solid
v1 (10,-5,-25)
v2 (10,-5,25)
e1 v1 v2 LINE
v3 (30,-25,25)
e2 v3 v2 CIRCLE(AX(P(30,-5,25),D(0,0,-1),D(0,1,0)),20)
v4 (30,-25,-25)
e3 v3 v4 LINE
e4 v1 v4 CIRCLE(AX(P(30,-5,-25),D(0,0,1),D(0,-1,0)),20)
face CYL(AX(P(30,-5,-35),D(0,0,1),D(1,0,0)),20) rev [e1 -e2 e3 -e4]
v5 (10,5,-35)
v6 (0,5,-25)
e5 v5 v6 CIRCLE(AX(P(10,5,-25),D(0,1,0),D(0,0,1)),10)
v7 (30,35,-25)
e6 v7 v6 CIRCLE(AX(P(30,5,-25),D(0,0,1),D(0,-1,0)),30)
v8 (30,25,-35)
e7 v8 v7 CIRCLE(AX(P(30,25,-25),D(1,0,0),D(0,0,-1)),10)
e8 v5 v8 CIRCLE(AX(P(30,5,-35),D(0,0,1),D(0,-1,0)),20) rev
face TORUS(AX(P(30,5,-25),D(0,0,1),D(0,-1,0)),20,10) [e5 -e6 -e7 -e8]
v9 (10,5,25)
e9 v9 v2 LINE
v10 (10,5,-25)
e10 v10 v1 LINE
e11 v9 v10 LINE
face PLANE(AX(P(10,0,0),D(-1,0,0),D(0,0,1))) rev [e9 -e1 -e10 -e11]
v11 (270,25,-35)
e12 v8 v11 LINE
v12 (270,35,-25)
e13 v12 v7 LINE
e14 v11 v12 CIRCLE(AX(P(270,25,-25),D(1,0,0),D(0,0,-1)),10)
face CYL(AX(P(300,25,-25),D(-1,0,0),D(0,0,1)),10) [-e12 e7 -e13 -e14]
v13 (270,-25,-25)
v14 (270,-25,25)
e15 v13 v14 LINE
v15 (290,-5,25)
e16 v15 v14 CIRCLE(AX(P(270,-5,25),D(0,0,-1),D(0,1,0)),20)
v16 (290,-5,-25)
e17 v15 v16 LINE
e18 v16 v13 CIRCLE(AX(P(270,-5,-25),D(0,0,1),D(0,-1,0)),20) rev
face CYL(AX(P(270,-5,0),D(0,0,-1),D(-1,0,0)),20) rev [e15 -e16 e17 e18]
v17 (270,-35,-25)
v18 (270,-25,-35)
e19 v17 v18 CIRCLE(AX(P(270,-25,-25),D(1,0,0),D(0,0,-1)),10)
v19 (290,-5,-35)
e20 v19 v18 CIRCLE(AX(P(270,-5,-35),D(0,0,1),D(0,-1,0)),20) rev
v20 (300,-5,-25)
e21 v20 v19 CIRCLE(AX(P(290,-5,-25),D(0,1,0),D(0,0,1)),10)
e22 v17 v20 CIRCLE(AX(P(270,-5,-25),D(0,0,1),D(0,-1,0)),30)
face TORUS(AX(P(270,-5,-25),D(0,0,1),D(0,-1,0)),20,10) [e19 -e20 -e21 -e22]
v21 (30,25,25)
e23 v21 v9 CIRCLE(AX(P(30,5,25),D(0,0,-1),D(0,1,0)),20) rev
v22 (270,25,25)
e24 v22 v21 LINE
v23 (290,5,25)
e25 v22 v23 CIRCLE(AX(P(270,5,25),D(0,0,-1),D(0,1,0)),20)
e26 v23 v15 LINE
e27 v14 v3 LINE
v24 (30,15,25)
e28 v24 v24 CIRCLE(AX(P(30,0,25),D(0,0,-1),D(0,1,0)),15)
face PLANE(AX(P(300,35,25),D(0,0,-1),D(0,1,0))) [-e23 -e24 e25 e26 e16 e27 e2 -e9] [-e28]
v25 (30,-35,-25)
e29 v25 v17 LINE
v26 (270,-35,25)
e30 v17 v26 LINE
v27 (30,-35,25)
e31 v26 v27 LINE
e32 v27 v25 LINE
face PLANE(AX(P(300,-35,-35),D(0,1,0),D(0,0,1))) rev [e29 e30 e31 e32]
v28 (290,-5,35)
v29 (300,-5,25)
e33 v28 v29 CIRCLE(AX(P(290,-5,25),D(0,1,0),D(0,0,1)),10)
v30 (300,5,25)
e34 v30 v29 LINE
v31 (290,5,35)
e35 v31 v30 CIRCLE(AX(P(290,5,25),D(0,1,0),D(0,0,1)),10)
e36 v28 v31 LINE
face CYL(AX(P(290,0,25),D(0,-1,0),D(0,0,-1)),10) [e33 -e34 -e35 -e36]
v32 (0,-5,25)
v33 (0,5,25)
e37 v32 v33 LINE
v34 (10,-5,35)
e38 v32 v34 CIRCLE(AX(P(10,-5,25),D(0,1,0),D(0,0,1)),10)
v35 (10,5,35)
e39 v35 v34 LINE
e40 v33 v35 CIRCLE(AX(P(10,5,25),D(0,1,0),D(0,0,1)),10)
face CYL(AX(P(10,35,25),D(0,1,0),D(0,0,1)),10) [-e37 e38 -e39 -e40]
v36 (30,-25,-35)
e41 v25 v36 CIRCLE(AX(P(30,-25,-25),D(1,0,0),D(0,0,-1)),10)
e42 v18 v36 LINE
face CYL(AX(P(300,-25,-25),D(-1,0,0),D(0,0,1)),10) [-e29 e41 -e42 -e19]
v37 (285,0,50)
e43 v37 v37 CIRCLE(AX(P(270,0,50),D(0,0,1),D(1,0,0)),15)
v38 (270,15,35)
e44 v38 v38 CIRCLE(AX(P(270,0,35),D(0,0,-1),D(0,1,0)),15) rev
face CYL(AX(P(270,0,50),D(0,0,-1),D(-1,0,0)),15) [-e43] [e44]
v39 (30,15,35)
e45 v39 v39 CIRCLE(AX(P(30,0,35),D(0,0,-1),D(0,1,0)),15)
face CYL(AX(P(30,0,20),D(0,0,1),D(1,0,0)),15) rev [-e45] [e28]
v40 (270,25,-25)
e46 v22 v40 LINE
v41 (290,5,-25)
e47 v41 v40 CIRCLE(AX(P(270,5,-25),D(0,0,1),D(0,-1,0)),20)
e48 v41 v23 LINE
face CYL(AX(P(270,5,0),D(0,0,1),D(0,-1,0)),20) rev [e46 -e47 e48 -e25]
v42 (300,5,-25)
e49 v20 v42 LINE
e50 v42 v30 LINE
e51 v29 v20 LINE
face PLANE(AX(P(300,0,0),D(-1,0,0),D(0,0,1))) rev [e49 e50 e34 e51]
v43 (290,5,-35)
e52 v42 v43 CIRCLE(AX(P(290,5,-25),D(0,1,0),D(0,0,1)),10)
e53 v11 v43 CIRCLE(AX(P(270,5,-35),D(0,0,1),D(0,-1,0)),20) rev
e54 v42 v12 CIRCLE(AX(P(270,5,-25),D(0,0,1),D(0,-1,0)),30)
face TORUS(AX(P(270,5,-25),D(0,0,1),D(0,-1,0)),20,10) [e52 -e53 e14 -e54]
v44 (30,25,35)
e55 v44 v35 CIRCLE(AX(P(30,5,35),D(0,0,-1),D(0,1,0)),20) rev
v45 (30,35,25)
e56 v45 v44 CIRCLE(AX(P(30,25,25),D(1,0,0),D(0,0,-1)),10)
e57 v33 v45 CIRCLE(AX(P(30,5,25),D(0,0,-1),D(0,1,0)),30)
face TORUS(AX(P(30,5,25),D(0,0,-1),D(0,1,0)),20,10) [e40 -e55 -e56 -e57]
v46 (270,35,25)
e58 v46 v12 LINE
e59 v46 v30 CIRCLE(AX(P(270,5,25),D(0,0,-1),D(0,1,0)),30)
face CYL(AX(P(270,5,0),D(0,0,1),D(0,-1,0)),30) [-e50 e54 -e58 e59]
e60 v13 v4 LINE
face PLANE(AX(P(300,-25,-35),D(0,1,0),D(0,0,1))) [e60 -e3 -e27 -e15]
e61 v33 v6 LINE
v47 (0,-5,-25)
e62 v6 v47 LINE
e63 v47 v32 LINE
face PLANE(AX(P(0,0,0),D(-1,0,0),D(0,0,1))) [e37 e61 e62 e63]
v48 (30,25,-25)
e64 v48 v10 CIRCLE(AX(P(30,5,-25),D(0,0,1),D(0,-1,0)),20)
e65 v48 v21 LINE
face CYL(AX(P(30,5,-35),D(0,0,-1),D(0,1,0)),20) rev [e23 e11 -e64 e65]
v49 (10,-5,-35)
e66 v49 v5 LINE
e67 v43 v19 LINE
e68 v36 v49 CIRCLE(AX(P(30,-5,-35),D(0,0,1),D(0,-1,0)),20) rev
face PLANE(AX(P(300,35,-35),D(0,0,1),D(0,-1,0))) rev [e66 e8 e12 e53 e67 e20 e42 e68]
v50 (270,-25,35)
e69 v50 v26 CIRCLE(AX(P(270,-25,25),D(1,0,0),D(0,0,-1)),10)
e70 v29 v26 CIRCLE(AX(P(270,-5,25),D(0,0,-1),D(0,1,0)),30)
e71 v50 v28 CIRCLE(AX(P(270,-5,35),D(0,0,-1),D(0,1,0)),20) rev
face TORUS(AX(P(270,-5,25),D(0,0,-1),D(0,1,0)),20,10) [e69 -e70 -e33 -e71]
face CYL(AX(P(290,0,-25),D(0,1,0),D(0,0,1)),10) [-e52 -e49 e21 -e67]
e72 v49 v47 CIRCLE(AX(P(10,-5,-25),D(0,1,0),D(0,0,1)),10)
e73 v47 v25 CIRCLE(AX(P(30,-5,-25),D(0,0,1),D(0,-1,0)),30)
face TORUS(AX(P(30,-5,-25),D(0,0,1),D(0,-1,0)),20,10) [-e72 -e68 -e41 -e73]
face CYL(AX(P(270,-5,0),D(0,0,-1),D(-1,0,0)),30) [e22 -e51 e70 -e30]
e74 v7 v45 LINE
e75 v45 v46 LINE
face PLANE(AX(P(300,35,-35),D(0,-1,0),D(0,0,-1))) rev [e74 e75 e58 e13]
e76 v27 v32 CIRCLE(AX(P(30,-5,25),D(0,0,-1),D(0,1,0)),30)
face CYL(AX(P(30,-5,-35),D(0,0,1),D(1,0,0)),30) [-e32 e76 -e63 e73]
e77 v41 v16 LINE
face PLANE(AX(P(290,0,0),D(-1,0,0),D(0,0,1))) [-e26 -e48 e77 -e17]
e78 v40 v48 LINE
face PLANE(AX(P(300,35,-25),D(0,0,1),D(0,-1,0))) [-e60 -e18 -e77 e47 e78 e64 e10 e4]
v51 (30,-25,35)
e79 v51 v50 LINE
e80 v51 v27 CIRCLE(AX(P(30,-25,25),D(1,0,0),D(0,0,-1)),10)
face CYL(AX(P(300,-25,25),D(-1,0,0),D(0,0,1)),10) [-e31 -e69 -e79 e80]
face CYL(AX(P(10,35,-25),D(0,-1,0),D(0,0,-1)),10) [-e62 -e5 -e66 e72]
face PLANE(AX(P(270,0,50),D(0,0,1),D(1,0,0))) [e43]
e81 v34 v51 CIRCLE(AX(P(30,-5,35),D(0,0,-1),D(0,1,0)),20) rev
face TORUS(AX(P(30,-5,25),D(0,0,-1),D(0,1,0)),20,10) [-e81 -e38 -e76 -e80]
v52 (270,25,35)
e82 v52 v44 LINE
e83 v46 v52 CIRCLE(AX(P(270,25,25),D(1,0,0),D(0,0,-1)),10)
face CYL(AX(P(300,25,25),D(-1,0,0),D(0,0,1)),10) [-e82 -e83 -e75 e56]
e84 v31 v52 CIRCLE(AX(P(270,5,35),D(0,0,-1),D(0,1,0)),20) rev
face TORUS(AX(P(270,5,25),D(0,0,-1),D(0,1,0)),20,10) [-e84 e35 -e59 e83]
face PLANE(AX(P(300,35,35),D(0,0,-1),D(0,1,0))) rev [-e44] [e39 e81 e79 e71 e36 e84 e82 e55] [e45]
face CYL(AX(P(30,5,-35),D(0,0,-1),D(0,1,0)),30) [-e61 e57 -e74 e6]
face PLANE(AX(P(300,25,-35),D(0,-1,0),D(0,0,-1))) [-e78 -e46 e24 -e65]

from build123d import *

# Parameters (mm, degrees)
SKETCH2_W           = 70
SKETCH2_H           = 70
BOSS_EXTRUDE1_DEPTH = 300
FILLET1_R           = 30
FILLET2_R           = 10
SHELL1_START        = -25
SHELL1_DEPTH        = 50
SKETCH3_R           = 15
BOSS_EXTRUDE2_DEPTH = 15
CUT_EXTRUDE1_START  = -30
SKETCH4_R           = 15
CUT_EXTRUDE1_DEPTH  = 30


# Read off the part's stored shape, not the designer's step: Shell1
with BuildPart() as part:
    # Sketch2 → Boss-Extrude1 (new body)
    with BuildSketch(Plane(origin=(0, 0, 0), x_dir=(0, 0, -1), z_dir=(1, 0, 0))):
        Rectangle(SKETCH2_W, SKETCH2_H)
    extrude(amount=BOSS_EXTRUDE1_DEPTH)

    # Fillet1
    fillet1_edges = [part.edges().sort_by_distance(p)[0] for p in [
        (300, 35, 0),
        (0, 35, 0),
        (0, -35, 0),
        (300, -35, 0),
    ]]
    fillet(fillet1_edges, radius=FILLET1_R)

    # Fillet2
    fillet2_edges = [part.edges().sort_by_distance(p)[0] for p in [
        (150, -35, -35),
        (150, -35, 35),
        (0, 0, -35),
        (150, 35, -35),
        (300, 0, -35),
        (291.213203436, 26.213203436, -35),
        (291.213203436, -26.213203436, -35),
        (8.786796564, 26.213203436, -35),
        (8.786796564, -26.213203436, -35),
        (0, 0, 35),
        (300, 0, 35),
        (150, 35, 35),
        (291.213203436, 26.213203436, 35),
        (291.213203436, -26.213203436, 35),
        (8.786796564, 26.213203436, 35),
        (8.786796564, -26.213203436, 35),
    ]]
    fillet(fillet2_edges, radius=FILLET2_R)

    # Shell1 outline → Shell1 (cut)
    with BuildSketch(Plane.XY.offset(SHELL1_START)):
        with BuildLine():
            Line((30, -25), (270, -25))
            ThreePointArc((270, -25), (284.142135624, -19.142135624), (290, -5))
            Line((290, -5), (290, 5))
            ThreePointArc((290, 5), (284.142135624, 19.142135624), (270, 25))
            Line((270, 25), (30, 25))
            ThreePointArc((30, 25), (15.857864376, 19.142135624), (10, 5))
            Line((10, 5), (10, -5))
            ThreePointArc((10, -5), (15.857864376, -19.142135624), (30, -25))
        make_face()
    extrude(amount=SHELL1_DEPTH, mode=Mode.SUBTRACT)

    # Sketch3 → Boss-Extrude2 (add)
    with BuildSketch(Plane.XY.offset(35)):
        with Locations(Location((30, 0, 0), (0, 0, 90))):
            Circle(SKETCH3_R)
        with Locations(Location((270, 0, 0), (0, 0, 90))):
            Circle(SKETCH3_R)
    extrude(amount=BOSS_EXTRUDE2_DEPTH)

    # Sketch4 → Cut-Extrude1 (cut)
    with BuildSketch(Plane.XY.offset(50).offset(CUT_EXTRUDE1_START)):
        with Locations(Location((30, 0, 0), (0, 0, 90))):
            Circle(SKETCH4_R)
    extrude(amount=CUT_EXTRUDE1_DEPTH, mode=Mode.SUBTRACT)


solid = part.part
